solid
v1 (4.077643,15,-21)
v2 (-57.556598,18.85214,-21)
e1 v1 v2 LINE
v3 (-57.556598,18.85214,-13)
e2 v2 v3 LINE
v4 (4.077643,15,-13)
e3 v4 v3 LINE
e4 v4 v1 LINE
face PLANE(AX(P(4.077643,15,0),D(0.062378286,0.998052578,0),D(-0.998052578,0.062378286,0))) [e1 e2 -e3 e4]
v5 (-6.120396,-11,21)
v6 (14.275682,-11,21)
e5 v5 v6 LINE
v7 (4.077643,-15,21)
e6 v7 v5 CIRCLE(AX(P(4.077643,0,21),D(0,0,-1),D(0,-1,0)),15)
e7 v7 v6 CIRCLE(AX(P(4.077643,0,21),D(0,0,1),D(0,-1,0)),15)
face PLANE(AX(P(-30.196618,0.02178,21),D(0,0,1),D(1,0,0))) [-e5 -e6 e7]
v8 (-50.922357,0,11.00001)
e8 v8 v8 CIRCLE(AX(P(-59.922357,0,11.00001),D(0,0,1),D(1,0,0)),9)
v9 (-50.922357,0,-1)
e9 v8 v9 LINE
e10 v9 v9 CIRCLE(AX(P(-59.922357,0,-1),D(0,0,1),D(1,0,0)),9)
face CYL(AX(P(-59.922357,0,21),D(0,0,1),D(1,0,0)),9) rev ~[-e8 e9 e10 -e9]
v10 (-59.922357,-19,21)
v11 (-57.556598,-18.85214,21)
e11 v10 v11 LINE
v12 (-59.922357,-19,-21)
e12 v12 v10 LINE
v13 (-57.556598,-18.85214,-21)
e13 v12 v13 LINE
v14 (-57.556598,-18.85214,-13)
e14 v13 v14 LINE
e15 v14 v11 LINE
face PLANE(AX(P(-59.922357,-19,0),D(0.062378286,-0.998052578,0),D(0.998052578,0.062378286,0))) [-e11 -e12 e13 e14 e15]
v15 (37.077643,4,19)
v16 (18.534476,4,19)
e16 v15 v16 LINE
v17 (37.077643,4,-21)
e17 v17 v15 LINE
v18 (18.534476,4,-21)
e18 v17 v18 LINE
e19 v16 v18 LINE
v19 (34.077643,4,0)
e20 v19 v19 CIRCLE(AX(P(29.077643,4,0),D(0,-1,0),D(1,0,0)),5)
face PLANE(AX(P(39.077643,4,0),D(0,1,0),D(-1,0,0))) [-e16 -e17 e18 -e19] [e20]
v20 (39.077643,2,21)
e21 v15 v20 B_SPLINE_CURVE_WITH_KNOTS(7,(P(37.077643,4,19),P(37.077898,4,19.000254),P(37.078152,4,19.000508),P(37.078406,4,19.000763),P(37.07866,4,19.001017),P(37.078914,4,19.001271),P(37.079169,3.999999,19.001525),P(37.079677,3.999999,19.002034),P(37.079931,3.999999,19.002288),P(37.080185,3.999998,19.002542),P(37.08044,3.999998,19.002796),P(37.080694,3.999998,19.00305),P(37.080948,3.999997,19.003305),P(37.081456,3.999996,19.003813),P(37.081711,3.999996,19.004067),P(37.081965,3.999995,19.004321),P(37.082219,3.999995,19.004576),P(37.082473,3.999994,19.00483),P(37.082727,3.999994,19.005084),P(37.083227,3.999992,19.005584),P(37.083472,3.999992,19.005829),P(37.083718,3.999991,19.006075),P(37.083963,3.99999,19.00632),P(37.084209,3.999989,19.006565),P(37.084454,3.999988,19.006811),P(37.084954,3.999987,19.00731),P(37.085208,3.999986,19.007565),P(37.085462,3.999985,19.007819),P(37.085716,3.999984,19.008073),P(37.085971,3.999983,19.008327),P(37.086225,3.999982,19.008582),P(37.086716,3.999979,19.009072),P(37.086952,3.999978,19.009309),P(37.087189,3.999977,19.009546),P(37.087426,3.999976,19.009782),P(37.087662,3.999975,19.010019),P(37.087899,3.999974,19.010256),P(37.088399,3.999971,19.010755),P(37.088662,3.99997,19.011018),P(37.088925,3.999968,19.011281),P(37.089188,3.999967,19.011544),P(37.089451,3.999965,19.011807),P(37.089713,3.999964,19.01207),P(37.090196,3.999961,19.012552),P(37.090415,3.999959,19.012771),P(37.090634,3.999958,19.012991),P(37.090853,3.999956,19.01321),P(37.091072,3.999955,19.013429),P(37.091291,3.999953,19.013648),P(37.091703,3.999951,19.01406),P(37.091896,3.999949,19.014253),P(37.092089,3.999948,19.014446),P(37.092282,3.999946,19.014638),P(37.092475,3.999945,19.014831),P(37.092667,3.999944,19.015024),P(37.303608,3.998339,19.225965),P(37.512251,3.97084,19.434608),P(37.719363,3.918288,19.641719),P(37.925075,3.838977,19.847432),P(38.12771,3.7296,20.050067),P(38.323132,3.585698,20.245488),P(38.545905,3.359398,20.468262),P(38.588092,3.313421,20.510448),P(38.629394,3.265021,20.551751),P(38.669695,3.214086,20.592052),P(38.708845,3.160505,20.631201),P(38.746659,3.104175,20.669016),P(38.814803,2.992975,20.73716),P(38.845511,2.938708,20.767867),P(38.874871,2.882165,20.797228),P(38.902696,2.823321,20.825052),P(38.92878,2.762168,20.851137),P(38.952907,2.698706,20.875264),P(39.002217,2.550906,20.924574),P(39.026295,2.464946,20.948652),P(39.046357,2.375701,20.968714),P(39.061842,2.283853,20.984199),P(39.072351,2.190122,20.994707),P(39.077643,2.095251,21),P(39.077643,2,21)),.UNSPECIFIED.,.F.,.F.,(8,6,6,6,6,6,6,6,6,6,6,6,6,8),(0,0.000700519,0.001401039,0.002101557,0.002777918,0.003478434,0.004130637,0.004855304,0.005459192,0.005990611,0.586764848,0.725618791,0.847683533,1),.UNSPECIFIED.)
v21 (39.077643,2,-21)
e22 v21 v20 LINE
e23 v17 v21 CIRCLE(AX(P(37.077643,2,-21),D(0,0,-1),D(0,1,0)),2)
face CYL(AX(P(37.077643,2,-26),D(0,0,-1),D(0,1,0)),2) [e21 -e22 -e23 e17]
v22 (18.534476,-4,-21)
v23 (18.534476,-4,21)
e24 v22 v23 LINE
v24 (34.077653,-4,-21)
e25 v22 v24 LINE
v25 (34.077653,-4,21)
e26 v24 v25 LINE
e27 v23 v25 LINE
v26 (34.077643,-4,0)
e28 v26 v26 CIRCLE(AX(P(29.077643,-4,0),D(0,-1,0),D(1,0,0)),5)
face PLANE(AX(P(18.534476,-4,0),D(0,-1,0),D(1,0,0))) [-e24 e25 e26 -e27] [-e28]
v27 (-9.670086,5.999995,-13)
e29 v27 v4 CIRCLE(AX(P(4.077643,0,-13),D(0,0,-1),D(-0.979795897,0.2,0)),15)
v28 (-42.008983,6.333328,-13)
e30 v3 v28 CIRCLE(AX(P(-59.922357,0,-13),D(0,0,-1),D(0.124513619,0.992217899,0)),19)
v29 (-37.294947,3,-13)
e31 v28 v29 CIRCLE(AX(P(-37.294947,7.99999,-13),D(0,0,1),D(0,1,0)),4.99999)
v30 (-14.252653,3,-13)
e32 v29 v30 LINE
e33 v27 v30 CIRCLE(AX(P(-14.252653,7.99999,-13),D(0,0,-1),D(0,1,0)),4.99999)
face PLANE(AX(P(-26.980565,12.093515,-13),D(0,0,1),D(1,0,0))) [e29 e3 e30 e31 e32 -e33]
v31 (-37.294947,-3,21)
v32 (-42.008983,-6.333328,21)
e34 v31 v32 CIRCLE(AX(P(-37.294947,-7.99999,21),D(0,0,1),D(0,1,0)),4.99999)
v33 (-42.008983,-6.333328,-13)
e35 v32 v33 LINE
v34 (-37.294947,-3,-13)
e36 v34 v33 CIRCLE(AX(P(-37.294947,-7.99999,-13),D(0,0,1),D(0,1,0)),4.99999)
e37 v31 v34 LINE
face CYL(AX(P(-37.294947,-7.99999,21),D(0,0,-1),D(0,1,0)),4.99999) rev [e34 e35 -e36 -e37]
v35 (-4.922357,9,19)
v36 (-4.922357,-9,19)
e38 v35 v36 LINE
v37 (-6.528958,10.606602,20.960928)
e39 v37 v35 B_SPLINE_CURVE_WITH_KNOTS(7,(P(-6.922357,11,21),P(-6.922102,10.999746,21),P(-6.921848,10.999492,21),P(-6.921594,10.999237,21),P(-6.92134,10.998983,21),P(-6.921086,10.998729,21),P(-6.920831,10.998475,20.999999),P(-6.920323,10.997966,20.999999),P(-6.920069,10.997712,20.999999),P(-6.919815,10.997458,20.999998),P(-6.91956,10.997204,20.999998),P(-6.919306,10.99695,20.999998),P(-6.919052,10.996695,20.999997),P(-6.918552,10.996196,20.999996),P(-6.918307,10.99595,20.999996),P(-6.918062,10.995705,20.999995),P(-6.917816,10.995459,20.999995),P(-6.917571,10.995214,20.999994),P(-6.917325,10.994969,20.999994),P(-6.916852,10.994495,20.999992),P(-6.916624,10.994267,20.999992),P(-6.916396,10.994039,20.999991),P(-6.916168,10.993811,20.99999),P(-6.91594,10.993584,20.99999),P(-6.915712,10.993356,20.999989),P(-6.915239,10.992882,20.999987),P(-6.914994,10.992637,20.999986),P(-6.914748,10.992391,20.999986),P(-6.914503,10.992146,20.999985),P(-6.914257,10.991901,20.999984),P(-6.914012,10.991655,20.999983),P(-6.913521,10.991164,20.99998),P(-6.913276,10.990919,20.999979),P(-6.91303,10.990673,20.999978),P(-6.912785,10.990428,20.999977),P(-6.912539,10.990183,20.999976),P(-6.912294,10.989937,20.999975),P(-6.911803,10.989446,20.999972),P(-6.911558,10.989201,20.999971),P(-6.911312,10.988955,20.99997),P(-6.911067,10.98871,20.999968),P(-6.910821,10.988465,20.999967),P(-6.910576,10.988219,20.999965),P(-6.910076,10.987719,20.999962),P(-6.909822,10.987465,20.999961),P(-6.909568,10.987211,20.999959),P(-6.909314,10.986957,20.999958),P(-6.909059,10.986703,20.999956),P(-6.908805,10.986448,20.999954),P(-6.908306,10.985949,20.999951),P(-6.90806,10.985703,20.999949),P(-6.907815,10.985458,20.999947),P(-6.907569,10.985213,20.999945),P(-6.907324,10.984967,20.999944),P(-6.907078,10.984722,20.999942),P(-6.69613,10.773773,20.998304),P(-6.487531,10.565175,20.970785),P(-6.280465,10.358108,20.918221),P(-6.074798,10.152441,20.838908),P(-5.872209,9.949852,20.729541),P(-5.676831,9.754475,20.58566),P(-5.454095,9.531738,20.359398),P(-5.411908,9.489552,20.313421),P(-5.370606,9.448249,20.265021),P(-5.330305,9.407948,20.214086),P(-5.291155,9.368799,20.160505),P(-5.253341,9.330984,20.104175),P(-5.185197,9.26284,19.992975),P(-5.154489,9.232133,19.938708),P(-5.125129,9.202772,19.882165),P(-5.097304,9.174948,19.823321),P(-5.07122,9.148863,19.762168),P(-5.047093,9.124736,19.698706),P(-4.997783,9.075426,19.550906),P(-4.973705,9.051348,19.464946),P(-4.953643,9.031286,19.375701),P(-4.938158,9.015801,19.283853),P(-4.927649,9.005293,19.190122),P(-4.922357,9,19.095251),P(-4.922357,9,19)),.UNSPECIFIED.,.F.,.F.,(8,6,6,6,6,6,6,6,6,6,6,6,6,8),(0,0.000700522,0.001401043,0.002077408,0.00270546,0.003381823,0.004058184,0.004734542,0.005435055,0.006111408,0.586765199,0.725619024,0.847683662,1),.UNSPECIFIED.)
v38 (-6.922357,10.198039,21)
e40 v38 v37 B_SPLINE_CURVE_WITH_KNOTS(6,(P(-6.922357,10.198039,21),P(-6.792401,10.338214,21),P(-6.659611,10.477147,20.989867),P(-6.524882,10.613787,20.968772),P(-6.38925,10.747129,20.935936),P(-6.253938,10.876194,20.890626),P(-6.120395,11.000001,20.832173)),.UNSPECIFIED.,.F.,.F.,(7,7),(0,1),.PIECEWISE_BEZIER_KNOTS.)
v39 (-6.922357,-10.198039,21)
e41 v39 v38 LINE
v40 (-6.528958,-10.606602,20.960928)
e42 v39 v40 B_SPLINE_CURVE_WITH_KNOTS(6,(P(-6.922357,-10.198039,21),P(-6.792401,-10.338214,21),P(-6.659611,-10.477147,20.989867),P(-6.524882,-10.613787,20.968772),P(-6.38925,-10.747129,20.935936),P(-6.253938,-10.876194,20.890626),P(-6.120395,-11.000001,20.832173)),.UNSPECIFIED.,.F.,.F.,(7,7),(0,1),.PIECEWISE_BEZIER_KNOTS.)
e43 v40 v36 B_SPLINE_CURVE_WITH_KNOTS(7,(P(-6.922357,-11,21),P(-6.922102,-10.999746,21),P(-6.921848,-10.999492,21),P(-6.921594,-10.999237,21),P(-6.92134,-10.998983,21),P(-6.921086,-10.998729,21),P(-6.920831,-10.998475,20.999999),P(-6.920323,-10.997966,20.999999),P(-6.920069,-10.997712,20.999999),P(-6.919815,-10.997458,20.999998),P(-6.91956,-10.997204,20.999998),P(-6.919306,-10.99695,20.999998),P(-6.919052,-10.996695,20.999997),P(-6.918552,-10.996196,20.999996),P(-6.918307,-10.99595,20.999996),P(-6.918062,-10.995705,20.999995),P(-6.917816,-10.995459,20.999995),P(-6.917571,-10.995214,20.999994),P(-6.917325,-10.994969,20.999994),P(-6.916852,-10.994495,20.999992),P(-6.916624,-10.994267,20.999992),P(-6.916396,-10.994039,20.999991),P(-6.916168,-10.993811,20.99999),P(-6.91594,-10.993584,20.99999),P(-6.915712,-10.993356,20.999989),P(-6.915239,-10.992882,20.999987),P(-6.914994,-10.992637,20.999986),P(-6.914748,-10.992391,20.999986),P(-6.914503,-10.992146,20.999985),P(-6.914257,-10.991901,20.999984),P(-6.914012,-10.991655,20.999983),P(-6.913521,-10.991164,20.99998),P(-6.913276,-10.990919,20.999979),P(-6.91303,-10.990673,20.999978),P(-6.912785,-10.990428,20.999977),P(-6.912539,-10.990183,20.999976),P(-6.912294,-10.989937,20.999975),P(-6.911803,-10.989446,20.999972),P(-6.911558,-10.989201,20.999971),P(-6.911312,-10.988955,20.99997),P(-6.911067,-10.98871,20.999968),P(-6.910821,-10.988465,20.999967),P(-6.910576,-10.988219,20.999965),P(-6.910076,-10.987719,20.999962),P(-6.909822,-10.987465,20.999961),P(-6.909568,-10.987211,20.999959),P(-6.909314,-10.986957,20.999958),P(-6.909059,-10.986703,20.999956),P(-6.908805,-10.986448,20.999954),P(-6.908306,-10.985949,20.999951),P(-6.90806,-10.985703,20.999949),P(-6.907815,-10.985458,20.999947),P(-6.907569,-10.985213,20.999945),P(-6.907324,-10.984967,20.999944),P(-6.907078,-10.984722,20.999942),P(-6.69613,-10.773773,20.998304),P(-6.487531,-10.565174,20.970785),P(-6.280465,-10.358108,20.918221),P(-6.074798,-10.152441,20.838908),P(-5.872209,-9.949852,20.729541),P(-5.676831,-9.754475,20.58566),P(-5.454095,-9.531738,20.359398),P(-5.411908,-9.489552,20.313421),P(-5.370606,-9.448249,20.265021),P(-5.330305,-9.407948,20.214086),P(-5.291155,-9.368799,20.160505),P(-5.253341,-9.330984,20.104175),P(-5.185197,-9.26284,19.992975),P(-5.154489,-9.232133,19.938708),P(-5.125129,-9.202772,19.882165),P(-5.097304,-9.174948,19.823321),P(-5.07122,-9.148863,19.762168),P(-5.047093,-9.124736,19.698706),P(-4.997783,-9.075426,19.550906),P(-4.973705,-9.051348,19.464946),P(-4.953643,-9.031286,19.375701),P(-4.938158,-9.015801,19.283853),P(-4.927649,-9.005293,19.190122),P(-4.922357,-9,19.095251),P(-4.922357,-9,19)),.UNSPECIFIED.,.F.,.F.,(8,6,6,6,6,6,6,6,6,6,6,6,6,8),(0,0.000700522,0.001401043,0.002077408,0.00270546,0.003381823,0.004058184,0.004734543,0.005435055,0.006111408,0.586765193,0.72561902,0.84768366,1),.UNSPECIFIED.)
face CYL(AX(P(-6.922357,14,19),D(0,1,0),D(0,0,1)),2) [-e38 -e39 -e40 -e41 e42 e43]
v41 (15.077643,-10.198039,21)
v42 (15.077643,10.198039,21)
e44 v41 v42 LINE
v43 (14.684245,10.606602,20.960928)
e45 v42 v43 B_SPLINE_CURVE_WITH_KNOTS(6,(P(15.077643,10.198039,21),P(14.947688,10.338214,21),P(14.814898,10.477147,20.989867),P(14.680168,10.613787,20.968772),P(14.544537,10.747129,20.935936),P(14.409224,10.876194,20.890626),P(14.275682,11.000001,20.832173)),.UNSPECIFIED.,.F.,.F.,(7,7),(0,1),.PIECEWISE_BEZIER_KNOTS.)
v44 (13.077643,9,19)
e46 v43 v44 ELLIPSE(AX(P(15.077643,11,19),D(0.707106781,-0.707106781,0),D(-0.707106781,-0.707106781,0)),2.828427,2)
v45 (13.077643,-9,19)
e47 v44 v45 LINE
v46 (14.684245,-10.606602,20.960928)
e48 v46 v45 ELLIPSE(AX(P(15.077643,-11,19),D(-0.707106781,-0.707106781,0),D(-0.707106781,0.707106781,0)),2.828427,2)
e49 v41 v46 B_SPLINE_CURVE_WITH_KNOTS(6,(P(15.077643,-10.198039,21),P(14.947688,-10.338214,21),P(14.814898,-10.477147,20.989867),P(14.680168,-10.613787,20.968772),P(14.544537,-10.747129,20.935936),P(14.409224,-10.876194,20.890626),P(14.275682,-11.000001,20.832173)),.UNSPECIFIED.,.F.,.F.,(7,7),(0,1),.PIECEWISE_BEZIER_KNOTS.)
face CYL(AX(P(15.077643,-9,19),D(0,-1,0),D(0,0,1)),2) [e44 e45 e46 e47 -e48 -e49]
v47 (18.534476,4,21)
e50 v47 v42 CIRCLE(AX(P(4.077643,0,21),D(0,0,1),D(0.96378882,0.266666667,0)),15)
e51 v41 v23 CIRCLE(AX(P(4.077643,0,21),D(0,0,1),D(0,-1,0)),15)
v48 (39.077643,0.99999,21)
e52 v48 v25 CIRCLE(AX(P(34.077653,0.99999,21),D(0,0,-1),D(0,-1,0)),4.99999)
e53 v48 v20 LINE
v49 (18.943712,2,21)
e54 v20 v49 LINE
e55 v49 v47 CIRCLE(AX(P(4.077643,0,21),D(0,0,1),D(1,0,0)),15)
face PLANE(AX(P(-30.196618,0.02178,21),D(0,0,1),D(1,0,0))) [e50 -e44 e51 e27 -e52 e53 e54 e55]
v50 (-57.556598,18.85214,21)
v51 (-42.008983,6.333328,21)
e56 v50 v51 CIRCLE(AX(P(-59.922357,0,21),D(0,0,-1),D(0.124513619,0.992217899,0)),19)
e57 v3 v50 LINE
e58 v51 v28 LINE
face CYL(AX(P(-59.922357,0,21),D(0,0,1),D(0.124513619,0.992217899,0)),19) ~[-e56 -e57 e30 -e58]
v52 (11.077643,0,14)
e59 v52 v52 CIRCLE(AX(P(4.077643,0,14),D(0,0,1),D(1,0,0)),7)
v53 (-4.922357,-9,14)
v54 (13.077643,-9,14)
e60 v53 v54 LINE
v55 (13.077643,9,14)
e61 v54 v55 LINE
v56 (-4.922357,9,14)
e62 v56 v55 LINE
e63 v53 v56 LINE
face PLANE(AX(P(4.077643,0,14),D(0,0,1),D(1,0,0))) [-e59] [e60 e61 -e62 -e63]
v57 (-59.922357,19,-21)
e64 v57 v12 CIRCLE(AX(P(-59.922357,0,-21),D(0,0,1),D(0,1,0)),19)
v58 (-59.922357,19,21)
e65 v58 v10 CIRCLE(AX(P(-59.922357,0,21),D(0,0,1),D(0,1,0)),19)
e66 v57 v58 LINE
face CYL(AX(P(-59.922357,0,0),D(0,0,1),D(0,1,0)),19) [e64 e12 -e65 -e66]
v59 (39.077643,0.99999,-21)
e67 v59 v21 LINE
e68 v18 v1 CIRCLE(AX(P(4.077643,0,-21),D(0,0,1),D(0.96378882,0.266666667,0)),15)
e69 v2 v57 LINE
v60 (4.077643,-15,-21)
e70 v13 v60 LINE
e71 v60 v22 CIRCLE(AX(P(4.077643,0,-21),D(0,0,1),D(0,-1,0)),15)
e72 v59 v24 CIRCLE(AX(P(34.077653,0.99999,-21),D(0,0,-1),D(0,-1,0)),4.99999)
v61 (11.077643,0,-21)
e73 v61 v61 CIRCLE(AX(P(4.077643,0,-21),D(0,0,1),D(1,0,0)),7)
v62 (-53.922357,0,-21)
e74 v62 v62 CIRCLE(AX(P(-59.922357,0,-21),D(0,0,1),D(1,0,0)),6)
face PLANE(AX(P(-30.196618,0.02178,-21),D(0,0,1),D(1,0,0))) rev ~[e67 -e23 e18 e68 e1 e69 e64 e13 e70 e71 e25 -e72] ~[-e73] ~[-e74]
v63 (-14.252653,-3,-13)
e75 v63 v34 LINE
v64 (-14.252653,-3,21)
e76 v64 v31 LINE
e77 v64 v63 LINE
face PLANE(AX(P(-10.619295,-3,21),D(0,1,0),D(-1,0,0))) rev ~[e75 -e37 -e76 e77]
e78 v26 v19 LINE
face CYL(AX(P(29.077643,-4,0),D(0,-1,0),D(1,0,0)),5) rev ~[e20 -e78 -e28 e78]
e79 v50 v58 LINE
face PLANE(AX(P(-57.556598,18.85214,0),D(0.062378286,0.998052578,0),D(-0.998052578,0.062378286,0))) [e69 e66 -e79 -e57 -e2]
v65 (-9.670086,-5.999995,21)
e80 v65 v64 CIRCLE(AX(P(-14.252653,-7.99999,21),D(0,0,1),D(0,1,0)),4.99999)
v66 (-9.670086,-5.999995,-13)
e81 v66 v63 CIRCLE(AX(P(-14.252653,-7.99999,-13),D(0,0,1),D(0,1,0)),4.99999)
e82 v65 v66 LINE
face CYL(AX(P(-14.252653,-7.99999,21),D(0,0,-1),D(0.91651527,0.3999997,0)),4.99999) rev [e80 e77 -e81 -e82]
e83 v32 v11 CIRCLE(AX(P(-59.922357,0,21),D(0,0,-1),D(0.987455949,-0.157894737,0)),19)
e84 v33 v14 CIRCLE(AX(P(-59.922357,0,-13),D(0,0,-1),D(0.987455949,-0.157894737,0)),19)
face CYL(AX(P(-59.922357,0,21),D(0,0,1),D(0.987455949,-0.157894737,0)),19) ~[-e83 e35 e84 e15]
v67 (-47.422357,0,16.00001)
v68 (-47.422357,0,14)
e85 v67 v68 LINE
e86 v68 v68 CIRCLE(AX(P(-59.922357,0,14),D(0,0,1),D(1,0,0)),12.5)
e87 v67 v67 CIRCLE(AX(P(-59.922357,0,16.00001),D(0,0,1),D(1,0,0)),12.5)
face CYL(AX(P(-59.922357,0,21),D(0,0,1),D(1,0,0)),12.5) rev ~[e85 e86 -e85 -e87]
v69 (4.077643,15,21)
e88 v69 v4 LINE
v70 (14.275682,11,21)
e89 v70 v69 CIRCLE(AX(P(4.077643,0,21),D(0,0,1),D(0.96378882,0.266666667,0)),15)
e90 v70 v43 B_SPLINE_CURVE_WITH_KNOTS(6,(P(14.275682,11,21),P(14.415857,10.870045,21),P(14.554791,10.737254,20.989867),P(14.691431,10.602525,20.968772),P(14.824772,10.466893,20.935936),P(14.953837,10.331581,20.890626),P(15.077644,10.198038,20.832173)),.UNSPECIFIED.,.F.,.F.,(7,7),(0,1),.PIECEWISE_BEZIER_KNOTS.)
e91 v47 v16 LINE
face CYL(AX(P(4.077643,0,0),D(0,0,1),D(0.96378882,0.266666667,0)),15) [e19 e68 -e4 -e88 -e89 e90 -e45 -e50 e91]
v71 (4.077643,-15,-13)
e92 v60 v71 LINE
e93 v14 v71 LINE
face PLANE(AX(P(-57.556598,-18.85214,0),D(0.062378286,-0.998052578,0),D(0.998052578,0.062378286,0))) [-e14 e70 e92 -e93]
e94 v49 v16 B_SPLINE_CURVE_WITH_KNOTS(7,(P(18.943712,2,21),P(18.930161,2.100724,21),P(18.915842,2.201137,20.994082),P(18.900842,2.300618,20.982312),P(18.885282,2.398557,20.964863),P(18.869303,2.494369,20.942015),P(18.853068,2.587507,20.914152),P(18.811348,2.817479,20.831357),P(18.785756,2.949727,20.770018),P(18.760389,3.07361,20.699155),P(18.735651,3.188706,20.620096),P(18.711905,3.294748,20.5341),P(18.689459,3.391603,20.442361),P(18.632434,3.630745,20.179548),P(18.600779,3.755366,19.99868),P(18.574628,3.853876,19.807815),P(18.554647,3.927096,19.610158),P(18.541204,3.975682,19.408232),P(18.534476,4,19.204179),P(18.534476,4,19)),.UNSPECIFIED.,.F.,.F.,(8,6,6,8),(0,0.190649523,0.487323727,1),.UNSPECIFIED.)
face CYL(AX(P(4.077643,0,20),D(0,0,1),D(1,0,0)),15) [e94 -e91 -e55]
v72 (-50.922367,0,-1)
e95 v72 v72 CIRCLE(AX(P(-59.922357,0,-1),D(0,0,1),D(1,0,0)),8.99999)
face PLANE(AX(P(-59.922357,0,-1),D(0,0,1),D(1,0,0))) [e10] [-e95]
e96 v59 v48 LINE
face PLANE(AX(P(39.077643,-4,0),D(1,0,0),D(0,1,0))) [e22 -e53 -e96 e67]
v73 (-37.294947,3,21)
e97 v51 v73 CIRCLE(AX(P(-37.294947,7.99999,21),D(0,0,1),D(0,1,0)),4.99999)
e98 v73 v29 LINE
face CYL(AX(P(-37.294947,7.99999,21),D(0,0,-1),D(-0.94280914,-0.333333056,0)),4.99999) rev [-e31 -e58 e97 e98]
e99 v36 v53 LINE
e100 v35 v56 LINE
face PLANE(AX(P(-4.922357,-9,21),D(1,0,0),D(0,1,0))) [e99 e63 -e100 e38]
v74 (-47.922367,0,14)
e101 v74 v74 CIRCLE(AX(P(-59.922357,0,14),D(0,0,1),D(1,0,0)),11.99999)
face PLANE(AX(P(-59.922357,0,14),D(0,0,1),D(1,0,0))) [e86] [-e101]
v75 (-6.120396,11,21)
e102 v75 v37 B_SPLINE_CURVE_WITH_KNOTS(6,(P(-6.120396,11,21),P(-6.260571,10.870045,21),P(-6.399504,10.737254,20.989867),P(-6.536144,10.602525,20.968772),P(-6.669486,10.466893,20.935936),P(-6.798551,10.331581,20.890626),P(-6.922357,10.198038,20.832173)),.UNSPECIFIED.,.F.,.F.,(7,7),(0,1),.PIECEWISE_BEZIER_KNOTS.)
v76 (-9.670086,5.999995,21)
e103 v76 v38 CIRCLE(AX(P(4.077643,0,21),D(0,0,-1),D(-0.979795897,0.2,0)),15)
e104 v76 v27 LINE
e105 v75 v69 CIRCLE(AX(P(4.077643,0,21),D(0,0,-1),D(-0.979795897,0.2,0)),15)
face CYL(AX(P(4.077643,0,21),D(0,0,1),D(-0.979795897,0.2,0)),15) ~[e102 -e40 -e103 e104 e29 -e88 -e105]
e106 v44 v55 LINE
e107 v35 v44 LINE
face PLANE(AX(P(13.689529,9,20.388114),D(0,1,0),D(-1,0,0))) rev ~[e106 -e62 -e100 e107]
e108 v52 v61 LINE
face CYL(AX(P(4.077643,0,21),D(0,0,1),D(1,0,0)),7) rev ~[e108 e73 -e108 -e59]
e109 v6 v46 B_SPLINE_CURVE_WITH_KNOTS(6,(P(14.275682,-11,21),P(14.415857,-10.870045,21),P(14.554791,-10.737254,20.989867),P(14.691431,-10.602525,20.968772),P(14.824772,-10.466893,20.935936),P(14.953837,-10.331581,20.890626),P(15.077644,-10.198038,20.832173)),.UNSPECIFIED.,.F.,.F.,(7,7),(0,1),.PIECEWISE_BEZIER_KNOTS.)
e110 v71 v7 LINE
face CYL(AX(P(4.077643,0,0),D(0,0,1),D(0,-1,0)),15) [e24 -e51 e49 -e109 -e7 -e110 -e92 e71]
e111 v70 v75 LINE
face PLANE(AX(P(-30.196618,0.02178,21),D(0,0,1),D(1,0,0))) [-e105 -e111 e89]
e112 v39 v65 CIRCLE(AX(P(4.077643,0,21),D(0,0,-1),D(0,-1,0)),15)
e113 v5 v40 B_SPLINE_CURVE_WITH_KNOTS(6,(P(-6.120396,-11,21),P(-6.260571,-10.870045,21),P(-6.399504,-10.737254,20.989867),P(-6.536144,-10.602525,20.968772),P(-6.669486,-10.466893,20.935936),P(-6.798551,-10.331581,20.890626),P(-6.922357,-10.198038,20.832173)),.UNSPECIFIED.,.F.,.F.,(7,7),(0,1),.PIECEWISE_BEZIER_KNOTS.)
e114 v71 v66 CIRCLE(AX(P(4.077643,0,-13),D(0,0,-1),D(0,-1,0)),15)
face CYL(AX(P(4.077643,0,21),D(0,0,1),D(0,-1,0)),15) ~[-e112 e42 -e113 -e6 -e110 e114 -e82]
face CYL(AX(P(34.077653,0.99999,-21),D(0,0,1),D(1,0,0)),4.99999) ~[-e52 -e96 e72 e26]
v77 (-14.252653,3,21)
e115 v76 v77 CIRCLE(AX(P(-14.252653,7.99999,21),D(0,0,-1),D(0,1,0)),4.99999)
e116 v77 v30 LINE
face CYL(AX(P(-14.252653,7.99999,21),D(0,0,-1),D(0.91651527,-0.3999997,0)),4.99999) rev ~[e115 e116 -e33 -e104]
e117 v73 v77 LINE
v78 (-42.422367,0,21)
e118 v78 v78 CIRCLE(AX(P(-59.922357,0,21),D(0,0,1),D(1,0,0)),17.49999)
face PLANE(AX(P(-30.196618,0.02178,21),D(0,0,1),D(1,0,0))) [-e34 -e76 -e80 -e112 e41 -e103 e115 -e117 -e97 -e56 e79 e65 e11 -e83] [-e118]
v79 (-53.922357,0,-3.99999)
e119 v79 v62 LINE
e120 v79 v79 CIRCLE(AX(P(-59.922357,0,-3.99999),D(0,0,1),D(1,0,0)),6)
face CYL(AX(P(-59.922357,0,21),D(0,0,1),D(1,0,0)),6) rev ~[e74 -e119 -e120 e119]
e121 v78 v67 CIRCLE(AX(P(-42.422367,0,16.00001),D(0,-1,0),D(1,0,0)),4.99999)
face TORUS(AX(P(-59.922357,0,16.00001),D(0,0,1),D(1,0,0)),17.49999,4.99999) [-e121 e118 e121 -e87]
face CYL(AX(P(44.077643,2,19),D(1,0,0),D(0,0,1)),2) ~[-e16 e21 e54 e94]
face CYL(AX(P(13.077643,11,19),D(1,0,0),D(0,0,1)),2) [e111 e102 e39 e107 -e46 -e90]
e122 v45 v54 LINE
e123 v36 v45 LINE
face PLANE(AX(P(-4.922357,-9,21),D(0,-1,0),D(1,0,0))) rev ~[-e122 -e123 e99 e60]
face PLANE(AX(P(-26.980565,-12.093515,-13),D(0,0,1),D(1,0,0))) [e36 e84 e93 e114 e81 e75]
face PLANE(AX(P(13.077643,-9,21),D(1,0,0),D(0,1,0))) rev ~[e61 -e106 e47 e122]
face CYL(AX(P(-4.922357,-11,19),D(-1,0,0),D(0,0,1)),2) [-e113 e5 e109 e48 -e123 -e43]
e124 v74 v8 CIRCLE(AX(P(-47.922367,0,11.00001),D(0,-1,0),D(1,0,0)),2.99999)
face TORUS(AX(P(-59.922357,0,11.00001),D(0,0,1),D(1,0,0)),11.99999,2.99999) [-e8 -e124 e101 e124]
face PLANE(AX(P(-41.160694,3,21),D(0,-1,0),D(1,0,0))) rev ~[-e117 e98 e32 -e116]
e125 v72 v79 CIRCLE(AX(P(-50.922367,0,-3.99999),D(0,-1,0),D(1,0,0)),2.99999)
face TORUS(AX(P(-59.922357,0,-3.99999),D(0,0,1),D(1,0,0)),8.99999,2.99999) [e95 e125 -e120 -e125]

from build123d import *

# Parameters (mm, degrees)
F1_DEPTH       = 21
F1_DEPTH_BACK  = 21
F3_DEPTH       = 34
F4_R           = 6
F4_R_2         = 7
F5_DEPTH       = 42
F6_R           = 9
F6_R_2         = 6
F7_DEPTH       = 22
F8_W           = 18
F8_H           = 18
F8_R           = 7
F9_DEPTH       = 7
F10_R          = 12.5
F11_DEPTH      = 7
F12_R          = 5
F13_DEPTH      = 8
F13_DEPTH_BACK = 8
F14_R          = 4.99999
F15_T1_DEPTH   = 18
F15_T3_DEPTH   = 18
F15_T5_DEPTH   = 52
F15_T10_DEPTH  = 30.5431677052
F15_S11_R      = 15
F15_T12_DEPTH  = 17
F15_T17_DEPTH  = 23
F15_T21_DEPTH  = 23
F15_T28_DEPTH  = 23
F15_T32_DEPTH  = 23
F15_T39_DEPTH  = 23
F15_T43_DEPTH  = 23
F15_T50_DEPTH  = 23
F15_T54_DEPTH  = 23
F16_R          = 2.99999


# Not quite as in the source:
# - a fillet or chamfer that OpenCascade refuses, or shapes differently, is made with other operations: its cross-section is extruded or revolved along the edge and cut away or added
# - a fillet or chamfer is up to 0.001 mm smaller than in the source, because OpenCascade refuses the exact size


with BuildPart() as f1:
    # F0 (on Top) → F1 (new body, two sides)
    with BuildSketch(Plane.XY) as f1_sk:
        with BuildLine():
            Line((4.0776433051, 15), (-57.5565979401, 18.8521400778))
            Line((-57.5565979401, 18.8521400778), (-59.9223566949, 19))
            ThreePointArc((-59.9223566949, 19), (-78.9223566949, 0), (-59.9223566949, -19))
            Line((-59.9223566949, -19), (-57.5565979401, -18.8521400778))
            Line((-57.5565979401, -18.8521400778), (4.0776433051, -15))
            ThreePointArc((4.0776433051, -15), (13.1605943674, -11.9373363863), (18.5344755999, -4))
            ThreePointArc((18.5344755999, -4), (19.0776433051, 0), (18.5344755999, 4))
            ThreePointArc((18.5344755999, 4), (13.1605943674, 11.9373363863), (4.0776433051, 15))
        make_face()
        with BuildLine():
            Line((39.0776433051, 4), (18.5344755999, 4))
            ThreePointArc((18.5344755999, 4), (19.0776433051, 0), (18.5344755999, -4))
            Line((18.5344755999, -4), (39.0776433051, -4))
            Line((39.0776433051, -4), (39.0776433051, 4))
        make_face()
    extrude(amount=F1_DEPTH)
    extrude(f1_sk.sketch, amount=-F1_DEPTH_BACK)

    # F2 (on face) → F3 (cut)
    with BuildSketch(Plane.XY.offset(21)):
        with BuildLine():
            Line((-57.5565979401, -18.8521400778), (-59.9223566949, -19))
            ThreePointArc((-59.9223566949, -19), (-58.737169258, -18.9629989912), (-57.5565979401, -18.8521400778))
        make_face()
        with BuildLine():
            ThreePointArc((-41.1606936556, -3), (-46.7157456922, -13.6596275872), (-57.5565979401, -18.8521400778))
            Line((-57.5565979401, -18.8521400778), (4.0776433051, -15))
            ThreePointArc((4.0776433051, -15), (-5.4091896754, -11.6189500386), (-10.6192951516, -3))
            Line((-10.6192951516, -3), (-41.1606936556, -3))
        make_face()
        with BuildLine():
            Line((-59.9223566949, 19), (-57.5565979401, 18.8521400778))
            ThreePointArc((-57.5565979401, 18.8521400778), (-58.737169258, 18.9629989912), (-59.9223566949, 19))
        make_face()
        with BuildLine():
            ThreePointArc((-10.6192951516, 3), (-5.4091896754, 11.6189500386), (4.0776433051, 15))
            Line((4.0776433051, 15), (-57.5565979401, 18.8521400778))
            ThreePointArc((-57.5565979401, 18.8521400778), (-46.7157456922, 13.6596275872), (-41.1606936556, 3))
            Line((-41.1606936556, 3), (-10.6192951516, 3))
        make_face()
    extrude(amount=-F3_DEPTH, mode=Mode.SUBTRACT)

    # F4 (on face) → F5 (cut)
    with BuildSketch(Plane.XY.offset(21)):
        with Locations((-59.9223566949, 0)):
            Circle(F4_R)
        with Locations((4.0776433051, 0)):
            Circle(F4_R_2)
    extrude(amount=-F5_DEPTH, mode=Mode.SUBTRACT)

    # F6 (on face) → F7 (cut)
    with BuildSketch(Plane.XY.offset(21)):
        with Locations((-59.9223566949, 0)):
            Circle(F6_R)
        with Locations((-59.9223566949, 0)):
            Circle(F6_R_2, mode=Mode.SUBTRACT)
    extrude(amount=-F7_DEPTH, mode=Mode.SUBTRACT)

    # F8 (on face) → F9 (cut)
    with BuildSketch(Plane.XY.offset(21)):
        with Locations((4.0776433051, 0)):
            Rectangle(F8_W, F8_H)
        with Locations((4.0776433051, 0)):
            Circle(F8_R, mode=Mode.SUBTRACT)
    extrude(amount=-F9_DEPTH, mode=Mode.SUBTRACT)

    # F10 (on face) → F11 (cut)
    with BuildSketch(Plane.XY.offset(21)):
        with Locations((-59.9223566949, 0)):
            Circle(F10_R)
    extrude(amount=-F11_DEPTH, mode=Mode.SUBTRACT)

    # F12 (on face) → F13 (cut, two sides)
    with BuildSketch(Plane.XZ.offset(4)) as f13_sk:
        with Locations((29.0776433051, 0)):
            Circle(F12_R)
    extrude(amount=-F13_DEPTH, mode=Mode.SUBTRACT)
    extrude(f13_sk.sketch, amount=F13_DEPTH_BACK, mode=Mode.SUBTRACT)

    # F14 (radius 5 in the source; OpenCascade refuses exactly that, so slightly less here)
    f14_edges = [f1.edges().sort_by_distance(p)[0] for p in [
        (-41.160694, -3, 4),
        (-10.619295, -3, 4),
        (-10.619295, 3, 4),
        (-41.160694, 3, 4),
        (-72.422357, 0, 21),
        (39.077643, -4, 0),
    ]]
    fillet(f14_edges, radius=F14_R)

    # F15: fillet of radius 2 on 6 edges, made by hand

    # F15_s2 → F15_t1 (cut)
    with BuildSketch(Plane.XZ.offset(-9)):
        with BuildLine():
            ThreePointArc((-6.9223566949, 21), (-5.5081431326, 20.4142135624), (-4.9223566949, 19))
            Line((-4.9223566949, 19), (-4.9223566949, 21))
            Line((-4.9223566949, 21), (-6.9223566949, 21))
        make_face()
        with BuildLine():
            ThreePointArc((15.0776433051, 21), (13.6634297427, 20.4142135624), (13.0776433051, 19))
            Line((13.0776433051, 19), (13.0776433051, 21))
            Line((13.0776433051, 21), (15.0776433051, 21))
        make_face()
    extrude(amount=F15_T1_DEPTH, mode=Mode.SUBTRACT)

    # F15_s4 → F15_t3 (cut)
    with BuildSketch(Plane.YZ.offset(-4.9223566949)):
        with BuildLine():
            ThreePointArc((11, 21), (9.5857864376, 20.4142135624), (9, 19))
            Line((9, 19), (9, 21))
            Line((9, 21), (11, 21))
        make_face()
        with BuildLine():
            ThreePointArc((-11, 21), (-9.5857864376, 20.4142135624), (-9, 19))
            Line((-9, 19), (-9, 21))
            Line((-9, 21), (-11, 21))
        make_face()
    extrude(amount=F15_T3_DEPTH, mode=Mode.SUBTRACT)

    # F15_s6 → F15_t5 (cut)
    with BuildSketch(Plane.XY.offset(-26)):
        with BuildLine():
            ThreePointArc((37.0776433051, 4), (38.4918568674, 3.4142135624), (39.0776433051, 2))
            Line((39.0776433051, 2), (39.0776433051, 4))
            Line((39.0776433051, 4), (37.0776433051, 4))
        make_face()
    extrude(amount=F15_T5_DEPTH, mode=Mode.SUBTRACT)


with BuildPart() as f15_tool8:
    # F15_s9 → F15_t10 (new body)
    with BuildSketch(Plane.YZ.offset(44.0776433051)):
        with BuildLine():
            ThreePointArc((2, 21), (3.4142135624, 20.4142135624), (4, 19))
            Line((4, 19), (4, 21))
            Line((4, 21), (2, 21))
        make_face()
    extrude(amount=-F15_T10_DEPTH)

    # F15_s11 → F15_t12 (cut, symmetric)
    with BuildSketch(Plane.XY.offset(20)):
        with Locations((4.0776433051, 0)):
            Circle(F15_S11_R)
    extrude(amount=F15_T12_DEPTH, both=True, mode=Mode.SUBTRACT)


with BuildPart() as f1_1:
    add(f1.part)

    # F15_t7: cut F15_tool8
    add(f15_tool8.part, mode=Mode.SUBTRACT)


with BuildPart() as f15_tool15:
    # F15_s16 → F15_t17 (new body)
    with BuildSketch(Plane.XZ.offset(-14)):
        with BuildLine():
            ThreePointArc((-6.9223566949, 21), (-5.5081431326, 20.4142135624), (-4.9223566949, 19))
            Line((-4.9223566949, 19), (-4.9223566949, 21))
            Line((-4.9223566949, 21), (-6.9223566949, 21))
        make_face()
    extrude(amount=F15_T17_DEPTH)

    split(bisect_by=Plane.XZ.offset(-9), keep=Keep.BOTTOM)


with BuildPart() as f15_tool19:
    # F15_s20 → F15_t21 (new body)
    with BuildSketch(Plane.YZ.offset(13.0776433051)):
        with BuildLine():
            ThreePointArc((11, 21), (9.5857864376, 20.4142135624), (9, 19))
            Line((9, 19), (9, 21))
            Line((9, 21), (11, 21))
        make_face()
    extrude(amount=-F15_T21_DEPTH)

    split(bisect_by=Plane.YZ.offset(-4.9223566949), keep=Keep.BOTTOM)


with BuildPart() as f15_tool15_1:
    add(f15_tool15.part)

    # F15_t23: intersect F15_tool19
    add(f15_tool19.part, mode=Mode.INTERSECT)


with BuildPart() as f1_2:
    add(f1_1.part)

    # F15_t13: cut F15_tool15
    add(f15_tool15_1.part, mode=Mode.SUBTRACT)


with BuildPart() as f15_tool26:
    # F15_s27 → F15_t28 (new body)
    with BuildSketch(Plane.YZ.offset(-9.9223566949)):
        with BuildLine():
            ThreePointArc((-11, 21), (-9.5857864376, 20.4142135624), (-9, 19))
            Line((-9, 19), (-9, 21))
            Line((-9, 21), (-11, 21))
        make_face()
    extrude(amount=F15_T28_DEPTH)

    split(bisect_by=Plane.YZ.offset(-4.9223566949), keep=Keep.BOTTOM)


with BuildPart() as f15_tool30:
    # F15_s31 → F15_t32 (new body)
    with BuildSketch(Plane.XZ.offset(-9)):
        with BuildLine():
            ThreePointArc((-6.9223566949, 21), (-5.5081431326, 20.4142135624), (-4.9223566949, 19))
            Line((-4.9223566949, 19), (-4.9223566949, 21))
            Line((-4.9223566949, 21), (-6.9223566949, 21))
        make_face()
    extrude(amount=F15_T32_DEPTH)

    split(bisect_by=Plane.XZ.offset(9), keep=Keep.TOP)


with BuildPart() as f15_tool26_1:
    add(f15_tool26.part)

    # F15_t34: intersect F15_tool30
    add(f15_tool30.part, mode=Mode.INTERSECT)


with BuildPart() as f1_3:
    add(f1_2.part)

    # F15_t24: cut F15_tool26
    add(f15_tool26_1.part, mode=Mode.SUBTRACT)


with BuildPart() as f15_tool37:
    # F15_s38 → F15_t39 (new body)
    with BuildSketch(Plane.XZ.offset(9)):
        with BuildLine():
            ThreePointArc((15.0776433051, 21), (13.6634297427, 20.4142135624), (13.0776433051, 19))
            Line((13.0776433051, 19), (13.0776433051, 21))
            Line((13.0776433051, 21), (15.0776433051, 21))
        make_face()
    extrude(amount=-F15_T39_DEPTH)

    split(bisect_by=Plane.XZ.offset(-9), keep=Keep.BOTTOM)


with BuildPart() as f15_tool41:
    # F15_s42 → F15_t43 (new body)
    with BuildSketch(Plane.YZ.offset(18.0776433051)):
        with BuildLine():
            ThreePointArc((11, 21), (9.5857864376, 20.4142135624), (9, 19))
            Line((9, 19), (9, 21))
            Line((9, 21), (11, 21))
        make_face()
    extrude(amount=-F15_T43_DEPTH)

    split(bisect_by=Plane.YZ.offset(13.0776433051), keep=Keep.TOP)


with BuildPart() as f15_tool37_1:
    add(f15_tool37.part)

    # F15_t45: intersect F15_tool41
    add(f15_tool41.part, mode=Mode.INTERSECT)


with BuildPart() as f1_4:
    add(f1_3.part)

    # F15_t35: cut F15_tool37
    add(f15_tool37_1.part, mode=Mode.SUBTRACT)


with BuildPart() as f15_tool48:
    # F15_s49 → F15_t50 (new body)
    with BuildSketch(Plane.YZ.offset(-4.9223566949)):
        with BuildLine():
            ThreePointArc((-11, 21), (-9.5857864376, 20.4142135624), (-9, 19))
            Line((-9, 19), (-9, 21))
            Line((-9, 21), (-11, 21))
        make_face()
    extrude(amount=F15_T50_DEPTH)

    split(bisect_by=Plane.YZ.offset(13.0776433051), keep=Keep.TOP)


with BuildPart() as f15_tool52:
    # F15_s53 → F15_t54 (new body)
    with BuildSketch(Plane.XZ.offset(14)):
        with BuildLine():
            ThreePointArc((15.0776433051, 21), (13.6634297427, 20.4142135624), (13.0776433051, 19))
            Line((13.0776433051, 19), (13.0776433051, 21))
            Line((13.0776433051, 21), (15.0776433051, 21))
        make_face()
    extrude(amount=-F15_T54_DEPTH)

    split(bisect_by=Plane.XZ.offset(9), keep=Keep.TOP)


with BuildPart() as f15_tool48_1:
    add(f15_tool48.part)

    # F15_t56: intersect F15_tool52
    add(f15_tool52.part, mode=Mode.INTERSECT)


with BuildPart() as f1_5:
    add(f1_4.part)

    # F15_t46: cut F15_tool48
    add(f15_tool48_1.part, mode=Mode.SUBTRACT)

    # F16 (radius 3 in the source; OpenCascade refuses exactly that, so slightly less here)
    f16_edges = [f1_5.edges().sort_by_distance(p)[0] for p in [
        (-68.922357, 0, 14),
        (-65.922357, 0, -1),
    ]]
    fillet(f16_edges, radius=F16_R)


solid = f1_5.part
